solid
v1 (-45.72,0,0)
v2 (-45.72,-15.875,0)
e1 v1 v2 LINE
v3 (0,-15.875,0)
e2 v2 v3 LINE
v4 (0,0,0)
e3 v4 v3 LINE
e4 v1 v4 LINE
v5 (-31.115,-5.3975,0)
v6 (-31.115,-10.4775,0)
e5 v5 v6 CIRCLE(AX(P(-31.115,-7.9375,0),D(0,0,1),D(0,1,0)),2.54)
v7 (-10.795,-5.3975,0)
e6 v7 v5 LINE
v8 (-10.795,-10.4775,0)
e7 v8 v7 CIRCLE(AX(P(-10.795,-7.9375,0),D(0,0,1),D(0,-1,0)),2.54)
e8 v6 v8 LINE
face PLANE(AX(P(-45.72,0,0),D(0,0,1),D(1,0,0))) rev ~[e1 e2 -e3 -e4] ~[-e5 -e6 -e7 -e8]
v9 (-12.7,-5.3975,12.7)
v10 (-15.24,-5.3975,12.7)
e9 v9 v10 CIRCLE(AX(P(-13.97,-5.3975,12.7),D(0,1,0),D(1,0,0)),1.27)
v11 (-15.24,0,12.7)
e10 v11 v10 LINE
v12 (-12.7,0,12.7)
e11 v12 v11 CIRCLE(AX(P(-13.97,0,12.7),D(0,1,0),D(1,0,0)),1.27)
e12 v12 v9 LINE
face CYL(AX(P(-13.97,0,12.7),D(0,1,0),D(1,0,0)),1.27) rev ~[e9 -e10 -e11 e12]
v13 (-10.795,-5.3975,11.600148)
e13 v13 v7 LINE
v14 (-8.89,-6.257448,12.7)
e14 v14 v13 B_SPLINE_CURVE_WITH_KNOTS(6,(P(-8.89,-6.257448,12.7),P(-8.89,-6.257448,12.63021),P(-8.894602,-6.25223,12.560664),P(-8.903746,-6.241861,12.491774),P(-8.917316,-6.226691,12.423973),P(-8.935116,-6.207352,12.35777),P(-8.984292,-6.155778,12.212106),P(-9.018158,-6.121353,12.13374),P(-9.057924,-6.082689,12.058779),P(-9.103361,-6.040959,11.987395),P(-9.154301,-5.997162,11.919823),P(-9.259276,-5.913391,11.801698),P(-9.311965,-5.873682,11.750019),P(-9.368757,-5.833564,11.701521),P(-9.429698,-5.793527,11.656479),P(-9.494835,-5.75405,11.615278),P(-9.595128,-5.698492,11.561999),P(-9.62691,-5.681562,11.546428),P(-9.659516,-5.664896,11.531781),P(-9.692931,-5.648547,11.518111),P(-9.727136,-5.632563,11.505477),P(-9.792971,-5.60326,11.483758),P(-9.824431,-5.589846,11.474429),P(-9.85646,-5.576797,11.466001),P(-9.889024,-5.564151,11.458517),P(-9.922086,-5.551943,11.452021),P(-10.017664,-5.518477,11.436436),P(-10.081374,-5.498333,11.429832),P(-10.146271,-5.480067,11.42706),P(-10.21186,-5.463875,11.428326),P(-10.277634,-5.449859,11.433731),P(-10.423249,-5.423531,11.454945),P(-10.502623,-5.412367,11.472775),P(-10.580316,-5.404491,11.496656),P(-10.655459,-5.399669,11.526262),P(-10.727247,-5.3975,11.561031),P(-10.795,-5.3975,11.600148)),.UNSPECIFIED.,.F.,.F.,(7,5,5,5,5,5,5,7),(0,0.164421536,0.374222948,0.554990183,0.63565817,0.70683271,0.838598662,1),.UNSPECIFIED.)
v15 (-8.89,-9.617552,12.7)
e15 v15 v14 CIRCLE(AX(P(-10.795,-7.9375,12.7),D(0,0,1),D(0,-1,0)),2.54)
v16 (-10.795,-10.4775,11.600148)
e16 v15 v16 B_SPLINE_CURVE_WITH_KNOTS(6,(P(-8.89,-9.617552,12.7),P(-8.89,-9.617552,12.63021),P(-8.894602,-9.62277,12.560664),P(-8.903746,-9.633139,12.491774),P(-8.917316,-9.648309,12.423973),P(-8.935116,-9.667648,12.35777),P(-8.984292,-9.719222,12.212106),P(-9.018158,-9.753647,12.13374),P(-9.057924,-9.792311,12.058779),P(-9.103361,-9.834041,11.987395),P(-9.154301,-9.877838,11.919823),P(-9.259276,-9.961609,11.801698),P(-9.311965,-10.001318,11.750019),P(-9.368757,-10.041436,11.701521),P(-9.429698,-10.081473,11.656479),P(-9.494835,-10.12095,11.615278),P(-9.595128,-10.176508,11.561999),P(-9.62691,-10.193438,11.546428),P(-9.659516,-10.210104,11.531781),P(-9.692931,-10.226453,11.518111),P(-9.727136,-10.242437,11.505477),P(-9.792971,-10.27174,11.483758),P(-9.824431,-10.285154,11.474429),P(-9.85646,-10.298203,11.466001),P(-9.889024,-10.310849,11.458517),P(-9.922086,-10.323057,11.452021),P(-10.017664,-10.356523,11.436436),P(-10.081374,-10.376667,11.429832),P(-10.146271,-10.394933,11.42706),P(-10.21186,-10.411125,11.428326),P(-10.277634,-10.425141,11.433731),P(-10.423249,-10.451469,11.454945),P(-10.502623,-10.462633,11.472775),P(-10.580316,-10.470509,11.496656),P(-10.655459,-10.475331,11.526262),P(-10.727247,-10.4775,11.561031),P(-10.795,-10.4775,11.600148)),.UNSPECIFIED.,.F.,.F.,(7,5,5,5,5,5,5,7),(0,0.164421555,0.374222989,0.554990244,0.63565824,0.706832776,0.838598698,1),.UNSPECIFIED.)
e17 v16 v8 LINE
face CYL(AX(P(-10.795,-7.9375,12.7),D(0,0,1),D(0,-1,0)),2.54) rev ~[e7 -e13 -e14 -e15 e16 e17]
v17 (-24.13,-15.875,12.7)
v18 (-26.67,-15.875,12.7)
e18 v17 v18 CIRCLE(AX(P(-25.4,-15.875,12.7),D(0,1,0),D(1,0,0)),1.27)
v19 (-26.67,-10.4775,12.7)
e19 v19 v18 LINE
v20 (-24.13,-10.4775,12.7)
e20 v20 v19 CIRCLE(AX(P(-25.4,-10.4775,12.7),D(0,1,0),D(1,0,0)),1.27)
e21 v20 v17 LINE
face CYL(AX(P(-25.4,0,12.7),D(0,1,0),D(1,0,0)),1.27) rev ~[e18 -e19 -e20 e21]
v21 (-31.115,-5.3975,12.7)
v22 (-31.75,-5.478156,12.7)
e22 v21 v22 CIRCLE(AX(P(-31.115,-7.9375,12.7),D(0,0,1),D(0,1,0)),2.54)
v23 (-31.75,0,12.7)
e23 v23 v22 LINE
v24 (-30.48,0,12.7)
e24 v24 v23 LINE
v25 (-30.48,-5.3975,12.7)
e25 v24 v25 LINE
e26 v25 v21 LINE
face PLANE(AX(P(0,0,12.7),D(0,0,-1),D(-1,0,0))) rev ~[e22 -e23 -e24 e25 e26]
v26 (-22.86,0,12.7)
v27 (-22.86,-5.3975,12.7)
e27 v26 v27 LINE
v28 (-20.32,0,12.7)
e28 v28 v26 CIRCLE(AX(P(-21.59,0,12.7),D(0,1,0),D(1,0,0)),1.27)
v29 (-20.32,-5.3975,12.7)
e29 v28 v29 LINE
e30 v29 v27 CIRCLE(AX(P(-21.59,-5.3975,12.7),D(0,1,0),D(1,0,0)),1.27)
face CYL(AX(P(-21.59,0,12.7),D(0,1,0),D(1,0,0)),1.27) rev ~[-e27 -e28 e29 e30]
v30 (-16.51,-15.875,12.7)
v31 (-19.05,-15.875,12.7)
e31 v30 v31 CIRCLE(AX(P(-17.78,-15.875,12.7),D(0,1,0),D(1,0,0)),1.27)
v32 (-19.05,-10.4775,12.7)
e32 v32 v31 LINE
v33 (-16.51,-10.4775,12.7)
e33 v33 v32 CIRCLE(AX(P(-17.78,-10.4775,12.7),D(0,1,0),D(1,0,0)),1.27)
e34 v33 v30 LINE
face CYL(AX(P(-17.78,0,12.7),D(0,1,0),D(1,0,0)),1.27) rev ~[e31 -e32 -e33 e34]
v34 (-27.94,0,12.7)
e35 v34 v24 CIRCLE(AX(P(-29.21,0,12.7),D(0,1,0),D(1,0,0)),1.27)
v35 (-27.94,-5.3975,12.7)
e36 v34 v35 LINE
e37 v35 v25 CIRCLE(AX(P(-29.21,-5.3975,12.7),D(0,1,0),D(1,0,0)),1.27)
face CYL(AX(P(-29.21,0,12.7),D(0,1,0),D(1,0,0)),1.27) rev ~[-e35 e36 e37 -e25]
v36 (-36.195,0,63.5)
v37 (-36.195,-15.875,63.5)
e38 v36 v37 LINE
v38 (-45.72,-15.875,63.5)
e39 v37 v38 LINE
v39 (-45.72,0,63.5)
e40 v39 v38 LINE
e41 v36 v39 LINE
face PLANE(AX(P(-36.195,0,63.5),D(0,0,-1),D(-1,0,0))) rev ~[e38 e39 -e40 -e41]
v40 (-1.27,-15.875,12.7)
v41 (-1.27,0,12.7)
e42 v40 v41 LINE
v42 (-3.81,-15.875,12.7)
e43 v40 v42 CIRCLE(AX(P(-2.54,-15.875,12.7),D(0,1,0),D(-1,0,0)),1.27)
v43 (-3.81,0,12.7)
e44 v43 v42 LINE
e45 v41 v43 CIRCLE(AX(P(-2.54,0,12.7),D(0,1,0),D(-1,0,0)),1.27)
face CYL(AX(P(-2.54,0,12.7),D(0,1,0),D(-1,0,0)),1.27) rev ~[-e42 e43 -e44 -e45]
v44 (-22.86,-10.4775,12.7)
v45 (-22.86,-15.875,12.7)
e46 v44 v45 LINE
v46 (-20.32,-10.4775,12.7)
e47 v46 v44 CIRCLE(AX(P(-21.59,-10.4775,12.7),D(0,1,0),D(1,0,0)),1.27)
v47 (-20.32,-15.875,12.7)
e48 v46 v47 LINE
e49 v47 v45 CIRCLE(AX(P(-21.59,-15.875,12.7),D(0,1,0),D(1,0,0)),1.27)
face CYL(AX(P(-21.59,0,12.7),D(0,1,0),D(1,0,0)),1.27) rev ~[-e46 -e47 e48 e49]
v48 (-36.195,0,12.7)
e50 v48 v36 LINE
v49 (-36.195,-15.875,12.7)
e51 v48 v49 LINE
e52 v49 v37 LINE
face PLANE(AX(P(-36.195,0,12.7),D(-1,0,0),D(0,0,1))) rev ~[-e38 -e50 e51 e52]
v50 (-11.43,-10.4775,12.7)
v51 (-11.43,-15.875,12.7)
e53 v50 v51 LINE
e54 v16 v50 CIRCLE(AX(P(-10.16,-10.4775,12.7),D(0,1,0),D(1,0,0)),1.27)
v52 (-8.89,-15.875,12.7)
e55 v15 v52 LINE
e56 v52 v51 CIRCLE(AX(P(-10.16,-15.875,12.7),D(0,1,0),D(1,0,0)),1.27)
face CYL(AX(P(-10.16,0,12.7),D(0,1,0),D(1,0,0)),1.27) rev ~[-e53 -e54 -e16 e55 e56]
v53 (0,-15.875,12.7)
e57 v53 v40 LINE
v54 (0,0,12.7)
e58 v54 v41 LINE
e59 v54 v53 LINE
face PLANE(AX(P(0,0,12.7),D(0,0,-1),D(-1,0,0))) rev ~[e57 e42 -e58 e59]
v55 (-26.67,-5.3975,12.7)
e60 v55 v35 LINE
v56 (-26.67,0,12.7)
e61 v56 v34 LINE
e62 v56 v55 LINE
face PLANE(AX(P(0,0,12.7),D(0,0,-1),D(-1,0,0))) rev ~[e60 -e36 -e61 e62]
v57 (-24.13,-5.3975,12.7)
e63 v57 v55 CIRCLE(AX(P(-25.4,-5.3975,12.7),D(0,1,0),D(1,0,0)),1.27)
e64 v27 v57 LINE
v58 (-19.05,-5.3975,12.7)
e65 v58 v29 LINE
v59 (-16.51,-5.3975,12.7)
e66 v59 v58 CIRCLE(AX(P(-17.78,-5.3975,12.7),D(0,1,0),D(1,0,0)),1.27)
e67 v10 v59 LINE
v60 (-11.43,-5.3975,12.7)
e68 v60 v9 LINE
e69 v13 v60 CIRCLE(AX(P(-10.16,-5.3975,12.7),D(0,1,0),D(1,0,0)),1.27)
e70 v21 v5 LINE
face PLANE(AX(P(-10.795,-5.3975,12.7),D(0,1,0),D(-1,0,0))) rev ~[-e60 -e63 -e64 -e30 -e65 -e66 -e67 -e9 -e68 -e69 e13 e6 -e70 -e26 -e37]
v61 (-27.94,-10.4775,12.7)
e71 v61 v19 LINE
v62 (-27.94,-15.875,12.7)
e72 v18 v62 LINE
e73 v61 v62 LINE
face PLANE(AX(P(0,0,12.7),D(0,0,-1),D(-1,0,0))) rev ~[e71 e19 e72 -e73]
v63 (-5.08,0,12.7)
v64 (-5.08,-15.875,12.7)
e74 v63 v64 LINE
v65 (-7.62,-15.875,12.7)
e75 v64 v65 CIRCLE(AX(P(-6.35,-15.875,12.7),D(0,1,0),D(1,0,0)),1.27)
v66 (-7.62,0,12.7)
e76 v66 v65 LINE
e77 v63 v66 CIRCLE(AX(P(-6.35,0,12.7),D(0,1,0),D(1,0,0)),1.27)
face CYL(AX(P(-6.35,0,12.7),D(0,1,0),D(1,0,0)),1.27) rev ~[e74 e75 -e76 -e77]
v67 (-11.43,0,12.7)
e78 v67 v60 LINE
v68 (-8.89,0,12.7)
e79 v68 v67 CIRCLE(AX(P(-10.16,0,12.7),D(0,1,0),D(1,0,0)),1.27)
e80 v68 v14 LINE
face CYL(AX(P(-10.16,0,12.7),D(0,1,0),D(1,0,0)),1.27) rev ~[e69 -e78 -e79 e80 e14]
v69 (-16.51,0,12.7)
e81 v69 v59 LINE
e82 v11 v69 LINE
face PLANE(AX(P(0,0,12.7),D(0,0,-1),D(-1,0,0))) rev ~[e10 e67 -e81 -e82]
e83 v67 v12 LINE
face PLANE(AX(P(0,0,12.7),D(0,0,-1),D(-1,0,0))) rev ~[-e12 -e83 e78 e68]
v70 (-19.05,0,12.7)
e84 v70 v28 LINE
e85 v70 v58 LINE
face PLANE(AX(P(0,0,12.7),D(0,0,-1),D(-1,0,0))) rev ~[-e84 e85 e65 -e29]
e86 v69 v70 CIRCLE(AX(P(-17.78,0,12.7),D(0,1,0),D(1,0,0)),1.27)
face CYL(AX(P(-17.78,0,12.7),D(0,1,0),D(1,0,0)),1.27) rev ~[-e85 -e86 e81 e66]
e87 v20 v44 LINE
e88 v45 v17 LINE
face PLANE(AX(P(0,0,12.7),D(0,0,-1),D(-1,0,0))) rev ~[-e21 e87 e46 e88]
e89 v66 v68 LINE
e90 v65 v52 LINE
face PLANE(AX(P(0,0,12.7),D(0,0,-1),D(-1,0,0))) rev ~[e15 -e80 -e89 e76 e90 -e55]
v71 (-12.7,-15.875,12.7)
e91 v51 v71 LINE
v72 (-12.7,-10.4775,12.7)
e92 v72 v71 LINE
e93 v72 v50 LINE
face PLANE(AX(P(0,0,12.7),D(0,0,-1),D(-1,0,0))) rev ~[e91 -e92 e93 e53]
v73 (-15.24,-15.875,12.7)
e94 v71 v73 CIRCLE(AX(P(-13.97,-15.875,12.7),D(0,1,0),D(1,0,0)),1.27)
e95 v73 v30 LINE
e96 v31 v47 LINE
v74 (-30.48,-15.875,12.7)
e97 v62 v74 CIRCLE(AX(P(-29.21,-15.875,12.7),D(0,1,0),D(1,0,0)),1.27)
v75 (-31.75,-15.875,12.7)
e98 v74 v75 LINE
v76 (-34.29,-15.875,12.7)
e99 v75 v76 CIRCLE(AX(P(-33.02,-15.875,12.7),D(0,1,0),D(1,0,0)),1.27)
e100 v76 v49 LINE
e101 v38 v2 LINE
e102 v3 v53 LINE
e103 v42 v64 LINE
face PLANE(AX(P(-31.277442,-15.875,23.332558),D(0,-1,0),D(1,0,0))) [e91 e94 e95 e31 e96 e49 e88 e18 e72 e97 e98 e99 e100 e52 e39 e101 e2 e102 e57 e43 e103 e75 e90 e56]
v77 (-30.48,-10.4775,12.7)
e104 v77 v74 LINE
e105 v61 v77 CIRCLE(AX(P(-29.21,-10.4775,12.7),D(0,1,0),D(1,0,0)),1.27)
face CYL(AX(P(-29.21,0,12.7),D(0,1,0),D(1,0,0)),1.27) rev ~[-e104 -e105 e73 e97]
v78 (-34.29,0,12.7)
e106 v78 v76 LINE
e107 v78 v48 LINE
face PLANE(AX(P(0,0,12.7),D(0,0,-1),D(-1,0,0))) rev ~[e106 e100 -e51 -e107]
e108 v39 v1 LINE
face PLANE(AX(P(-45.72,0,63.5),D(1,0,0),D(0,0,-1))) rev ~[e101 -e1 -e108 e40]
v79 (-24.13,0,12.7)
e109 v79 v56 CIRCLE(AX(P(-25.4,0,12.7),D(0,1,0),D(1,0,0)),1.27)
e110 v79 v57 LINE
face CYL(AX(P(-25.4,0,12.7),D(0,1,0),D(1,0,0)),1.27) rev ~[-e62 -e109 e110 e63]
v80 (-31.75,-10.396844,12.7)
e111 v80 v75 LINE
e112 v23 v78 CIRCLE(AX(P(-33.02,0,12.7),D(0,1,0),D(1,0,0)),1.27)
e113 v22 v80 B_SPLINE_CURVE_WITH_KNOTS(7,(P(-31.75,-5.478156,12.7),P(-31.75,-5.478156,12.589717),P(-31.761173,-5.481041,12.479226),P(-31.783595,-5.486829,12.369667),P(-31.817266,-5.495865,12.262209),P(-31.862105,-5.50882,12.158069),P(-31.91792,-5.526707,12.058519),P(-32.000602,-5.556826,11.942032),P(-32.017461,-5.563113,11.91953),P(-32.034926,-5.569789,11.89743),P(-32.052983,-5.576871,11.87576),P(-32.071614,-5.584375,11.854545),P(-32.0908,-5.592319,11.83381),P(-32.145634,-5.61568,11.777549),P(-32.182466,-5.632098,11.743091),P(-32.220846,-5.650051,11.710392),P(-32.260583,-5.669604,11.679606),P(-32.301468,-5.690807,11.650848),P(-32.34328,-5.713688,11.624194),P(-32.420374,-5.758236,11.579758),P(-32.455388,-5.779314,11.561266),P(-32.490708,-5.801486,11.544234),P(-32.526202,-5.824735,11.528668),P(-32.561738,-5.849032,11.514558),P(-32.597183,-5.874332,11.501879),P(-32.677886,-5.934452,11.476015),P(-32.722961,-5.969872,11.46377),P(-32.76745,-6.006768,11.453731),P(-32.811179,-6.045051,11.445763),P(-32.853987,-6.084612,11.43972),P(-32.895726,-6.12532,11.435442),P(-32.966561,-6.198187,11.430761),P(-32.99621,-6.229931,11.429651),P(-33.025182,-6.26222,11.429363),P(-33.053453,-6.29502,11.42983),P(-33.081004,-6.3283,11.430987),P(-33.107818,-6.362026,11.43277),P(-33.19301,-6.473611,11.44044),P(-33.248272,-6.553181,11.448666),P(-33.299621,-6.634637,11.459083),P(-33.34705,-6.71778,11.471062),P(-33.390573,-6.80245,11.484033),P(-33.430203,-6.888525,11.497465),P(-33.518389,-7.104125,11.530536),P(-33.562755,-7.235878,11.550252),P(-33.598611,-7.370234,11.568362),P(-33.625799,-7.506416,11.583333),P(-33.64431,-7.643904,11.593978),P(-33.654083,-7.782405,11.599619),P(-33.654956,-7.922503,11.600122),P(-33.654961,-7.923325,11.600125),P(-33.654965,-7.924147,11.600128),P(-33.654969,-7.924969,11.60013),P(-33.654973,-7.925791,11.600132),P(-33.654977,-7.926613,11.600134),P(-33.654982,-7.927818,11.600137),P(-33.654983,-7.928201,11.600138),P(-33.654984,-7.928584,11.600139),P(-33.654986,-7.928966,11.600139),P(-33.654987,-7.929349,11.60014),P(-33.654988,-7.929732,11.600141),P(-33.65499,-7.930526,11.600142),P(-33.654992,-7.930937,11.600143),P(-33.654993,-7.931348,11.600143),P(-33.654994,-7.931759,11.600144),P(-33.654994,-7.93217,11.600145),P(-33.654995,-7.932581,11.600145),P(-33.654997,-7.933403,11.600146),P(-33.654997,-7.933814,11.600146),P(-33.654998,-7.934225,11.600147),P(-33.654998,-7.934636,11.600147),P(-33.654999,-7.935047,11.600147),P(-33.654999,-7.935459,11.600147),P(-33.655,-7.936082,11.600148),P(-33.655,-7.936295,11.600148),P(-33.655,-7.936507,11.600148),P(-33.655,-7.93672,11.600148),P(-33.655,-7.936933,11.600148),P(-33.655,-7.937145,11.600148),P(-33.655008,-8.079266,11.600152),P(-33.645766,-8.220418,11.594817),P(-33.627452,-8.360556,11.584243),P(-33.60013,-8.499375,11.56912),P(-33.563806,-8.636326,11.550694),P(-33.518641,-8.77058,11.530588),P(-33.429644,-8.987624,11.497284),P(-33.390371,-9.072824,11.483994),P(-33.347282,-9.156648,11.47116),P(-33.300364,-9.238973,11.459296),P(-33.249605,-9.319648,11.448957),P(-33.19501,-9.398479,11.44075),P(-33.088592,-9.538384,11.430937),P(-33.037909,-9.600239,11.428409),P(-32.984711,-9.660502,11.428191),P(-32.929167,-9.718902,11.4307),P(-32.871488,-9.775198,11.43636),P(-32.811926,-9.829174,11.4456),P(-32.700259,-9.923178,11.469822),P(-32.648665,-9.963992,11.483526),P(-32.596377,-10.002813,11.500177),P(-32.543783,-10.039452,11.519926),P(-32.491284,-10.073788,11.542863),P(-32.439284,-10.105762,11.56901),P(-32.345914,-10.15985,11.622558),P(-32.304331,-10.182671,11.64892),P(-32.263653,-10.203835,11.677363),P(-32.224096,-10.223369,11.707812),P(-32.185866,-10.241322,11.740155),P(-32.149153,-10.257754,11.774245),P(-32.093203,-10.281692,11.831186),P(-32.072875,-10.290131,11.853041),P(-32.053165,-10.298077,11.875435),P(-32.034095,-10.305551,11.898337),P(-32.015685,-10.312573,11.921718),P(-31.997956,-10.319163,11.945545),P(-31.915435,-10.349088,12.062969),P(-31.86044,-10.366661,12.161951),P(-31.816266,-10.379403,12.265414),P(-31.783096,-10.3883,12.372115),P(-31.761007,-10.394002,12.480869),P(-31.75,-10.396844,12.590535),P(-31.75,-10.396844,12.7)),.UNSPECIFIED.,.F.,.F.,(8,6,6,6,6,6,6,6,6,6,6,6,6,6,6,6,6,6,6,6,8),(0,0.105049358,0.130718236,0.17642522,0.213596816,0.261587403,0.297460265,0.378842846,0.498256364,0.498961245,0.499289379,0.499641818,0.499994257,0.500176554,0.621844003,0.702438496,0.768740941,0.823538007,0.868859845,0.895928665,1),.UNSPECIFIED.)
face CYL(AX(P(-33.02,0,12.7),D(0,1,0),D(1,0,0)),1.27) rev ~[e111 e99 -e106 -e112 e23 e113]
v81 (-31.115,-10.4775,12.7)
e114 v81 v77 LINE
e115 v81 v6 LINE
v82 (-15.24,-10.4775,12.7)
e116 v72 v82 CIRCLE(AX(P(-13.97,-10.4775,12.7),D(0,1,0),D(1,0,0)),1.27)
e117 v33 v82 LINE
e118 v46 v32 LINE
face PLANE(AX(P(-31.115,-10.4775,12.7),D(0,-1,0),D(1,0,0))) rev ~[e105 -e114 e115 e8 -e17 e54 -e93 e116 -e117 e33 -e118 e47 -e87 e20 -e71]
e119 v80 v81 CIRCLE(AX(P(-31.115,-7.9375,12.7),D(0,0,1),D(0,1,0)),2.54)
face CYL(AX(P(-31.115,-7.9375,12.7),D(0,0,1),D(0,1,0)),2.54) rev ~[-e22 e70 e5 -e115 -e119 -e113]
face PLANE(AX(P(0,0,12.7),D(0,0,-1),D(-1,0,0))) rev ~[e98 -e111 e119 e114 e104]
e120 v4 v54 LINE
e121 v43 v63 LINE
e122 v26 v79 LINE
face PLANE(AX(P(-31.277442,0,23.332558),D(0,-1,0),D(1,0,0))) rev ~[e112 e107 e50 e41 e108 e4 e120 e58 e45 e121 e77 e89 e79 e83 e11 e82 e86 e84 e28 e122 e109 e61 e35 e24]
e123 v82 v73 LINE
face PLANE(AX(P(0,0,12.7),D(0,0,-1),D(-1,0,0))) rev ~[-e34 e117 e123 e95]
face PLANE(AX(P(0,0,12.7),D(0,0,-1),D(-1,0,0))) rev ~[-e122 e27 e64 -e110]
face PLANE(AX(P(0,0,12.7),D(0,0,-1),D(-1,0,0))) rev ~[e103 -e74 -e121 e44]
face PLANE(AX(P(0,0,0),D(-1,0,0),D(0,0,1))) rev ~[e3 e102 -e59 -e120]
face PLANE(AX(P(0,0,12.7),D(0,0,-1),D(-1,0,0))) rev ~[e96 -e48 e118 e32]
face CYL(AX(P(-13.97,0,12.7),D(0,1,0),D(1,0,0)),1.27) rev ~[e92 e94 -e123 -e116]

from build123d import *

# Parameters (mm, degrees)
F1_DEPTH = 15.875
F3_DEPTH = 25.4
F5_DEPTH = 25.4


with BuildPart() as f1:
    # F0 (on Front) → F1 (new body)
    with BuildSketch(Plane.XZ):
        Polygon((-45.72, 0), (0, 0), (0, 12.7), (-36.195, 12.7), (-36.195, 63.5), (-45.72, 63.5), align=None)
    extrude(amount=F1_DEPTH)

    # F2 (on face) → F3 (cut)
    with BuildSketch(Plane.XY.offset(12.7)):
        with BuildLine():
            Line((-10.795, -5.3975), (-31.115, -5.3975))
            ThreePointArc((-31.115, -5.3975), (-33.655, -7.9375), (-31.115, -10.4775))
            Line((-31.115, -10.4775), (-10.795, -10.4775))
            ThreePointArc((-10.795, -10.4775), (-8.255, -7.9375), (-10.795, -5.3975))
        make_face()
    extrude(amount=-F3_DEPTH, mode=Mode.SUBTRACT)

    # F4 (on face) → F5 (cut)
    with BuildSketch(Plane(origin=(0, 0, 0), x_dir=(-1, 0, 0), z_dir=(0, 1, 0))):
        with BuildLine():
            ThreePointArc((24.13, 12.7), (25.4, 11.43), (26.67, 12.7))
            Line((26.67, 12.7), (24.13, 12.7))
        make_face()
        with BuildLine():
            Line((30.48, 12.7), (27.94, 12.7))
            ThreePointArc((27.94, 12.7), (29.21, 11.43), (30.48, 12.7))
        make_face()
        with BuildLine():
            ThreePointArc((20.32, 12.7), (21.59, 11.43), (22.86, 12.7))
            Line((22.86, 12.7), (20.32, 12.7))
        make_face()
        with BuildLine():
            Line((34.29, 12.7), (31.75, 12.7))
            ThreePointArc((31.75, 12.7), (33.02, 11.43), (34.29, 12.7))
        make_face()
        with BuildLine():
            ThreePointArc((16.51, 12.7), (17.78, 11.43), (19.05, 12.7))
            Line((19.05, 12.7), (16.51, 12.7))
        make_face()
        with BuildLine():
            ThreePointArc((12.7, 12.7), (13.97, 11.43), (15.24, 12.7))
            Line((15.24, 12.7), (12.7, 12.7))
        make_face()
        with BuildLine():
            ThreePointArc((8.89, 12.7), (10.16, 11.43), (11.43, 12.7))
            Line((11.43, 12.7), (8.89, 12.7))
        make_face()
        with BuildLine():
            ThreePointArc((5.08, 12.7), (6.35, 11.43), (7.62, 12.7))
            Line((7.62, 12.7), (5.08, 12.7))
        make_face()
        with BuildLine():
            Line((3.81, 12.7), (1.27, 12.7))
            ThreePointArc((1.27, 12.7), (2.54, 11.43), (3.81, 12.7))
        make_face()
        with BuildLine():
            ThreePointArc((3.81, 12.7), (2.54, 13.97), (1.27, 12.7))
            Line((1.27, 12.7), (3.81, 12.7))
        make_face()
    extrude(amount=-F5_DEPTH, mode=Mode.SUBTRACT)


solid = f1.part
